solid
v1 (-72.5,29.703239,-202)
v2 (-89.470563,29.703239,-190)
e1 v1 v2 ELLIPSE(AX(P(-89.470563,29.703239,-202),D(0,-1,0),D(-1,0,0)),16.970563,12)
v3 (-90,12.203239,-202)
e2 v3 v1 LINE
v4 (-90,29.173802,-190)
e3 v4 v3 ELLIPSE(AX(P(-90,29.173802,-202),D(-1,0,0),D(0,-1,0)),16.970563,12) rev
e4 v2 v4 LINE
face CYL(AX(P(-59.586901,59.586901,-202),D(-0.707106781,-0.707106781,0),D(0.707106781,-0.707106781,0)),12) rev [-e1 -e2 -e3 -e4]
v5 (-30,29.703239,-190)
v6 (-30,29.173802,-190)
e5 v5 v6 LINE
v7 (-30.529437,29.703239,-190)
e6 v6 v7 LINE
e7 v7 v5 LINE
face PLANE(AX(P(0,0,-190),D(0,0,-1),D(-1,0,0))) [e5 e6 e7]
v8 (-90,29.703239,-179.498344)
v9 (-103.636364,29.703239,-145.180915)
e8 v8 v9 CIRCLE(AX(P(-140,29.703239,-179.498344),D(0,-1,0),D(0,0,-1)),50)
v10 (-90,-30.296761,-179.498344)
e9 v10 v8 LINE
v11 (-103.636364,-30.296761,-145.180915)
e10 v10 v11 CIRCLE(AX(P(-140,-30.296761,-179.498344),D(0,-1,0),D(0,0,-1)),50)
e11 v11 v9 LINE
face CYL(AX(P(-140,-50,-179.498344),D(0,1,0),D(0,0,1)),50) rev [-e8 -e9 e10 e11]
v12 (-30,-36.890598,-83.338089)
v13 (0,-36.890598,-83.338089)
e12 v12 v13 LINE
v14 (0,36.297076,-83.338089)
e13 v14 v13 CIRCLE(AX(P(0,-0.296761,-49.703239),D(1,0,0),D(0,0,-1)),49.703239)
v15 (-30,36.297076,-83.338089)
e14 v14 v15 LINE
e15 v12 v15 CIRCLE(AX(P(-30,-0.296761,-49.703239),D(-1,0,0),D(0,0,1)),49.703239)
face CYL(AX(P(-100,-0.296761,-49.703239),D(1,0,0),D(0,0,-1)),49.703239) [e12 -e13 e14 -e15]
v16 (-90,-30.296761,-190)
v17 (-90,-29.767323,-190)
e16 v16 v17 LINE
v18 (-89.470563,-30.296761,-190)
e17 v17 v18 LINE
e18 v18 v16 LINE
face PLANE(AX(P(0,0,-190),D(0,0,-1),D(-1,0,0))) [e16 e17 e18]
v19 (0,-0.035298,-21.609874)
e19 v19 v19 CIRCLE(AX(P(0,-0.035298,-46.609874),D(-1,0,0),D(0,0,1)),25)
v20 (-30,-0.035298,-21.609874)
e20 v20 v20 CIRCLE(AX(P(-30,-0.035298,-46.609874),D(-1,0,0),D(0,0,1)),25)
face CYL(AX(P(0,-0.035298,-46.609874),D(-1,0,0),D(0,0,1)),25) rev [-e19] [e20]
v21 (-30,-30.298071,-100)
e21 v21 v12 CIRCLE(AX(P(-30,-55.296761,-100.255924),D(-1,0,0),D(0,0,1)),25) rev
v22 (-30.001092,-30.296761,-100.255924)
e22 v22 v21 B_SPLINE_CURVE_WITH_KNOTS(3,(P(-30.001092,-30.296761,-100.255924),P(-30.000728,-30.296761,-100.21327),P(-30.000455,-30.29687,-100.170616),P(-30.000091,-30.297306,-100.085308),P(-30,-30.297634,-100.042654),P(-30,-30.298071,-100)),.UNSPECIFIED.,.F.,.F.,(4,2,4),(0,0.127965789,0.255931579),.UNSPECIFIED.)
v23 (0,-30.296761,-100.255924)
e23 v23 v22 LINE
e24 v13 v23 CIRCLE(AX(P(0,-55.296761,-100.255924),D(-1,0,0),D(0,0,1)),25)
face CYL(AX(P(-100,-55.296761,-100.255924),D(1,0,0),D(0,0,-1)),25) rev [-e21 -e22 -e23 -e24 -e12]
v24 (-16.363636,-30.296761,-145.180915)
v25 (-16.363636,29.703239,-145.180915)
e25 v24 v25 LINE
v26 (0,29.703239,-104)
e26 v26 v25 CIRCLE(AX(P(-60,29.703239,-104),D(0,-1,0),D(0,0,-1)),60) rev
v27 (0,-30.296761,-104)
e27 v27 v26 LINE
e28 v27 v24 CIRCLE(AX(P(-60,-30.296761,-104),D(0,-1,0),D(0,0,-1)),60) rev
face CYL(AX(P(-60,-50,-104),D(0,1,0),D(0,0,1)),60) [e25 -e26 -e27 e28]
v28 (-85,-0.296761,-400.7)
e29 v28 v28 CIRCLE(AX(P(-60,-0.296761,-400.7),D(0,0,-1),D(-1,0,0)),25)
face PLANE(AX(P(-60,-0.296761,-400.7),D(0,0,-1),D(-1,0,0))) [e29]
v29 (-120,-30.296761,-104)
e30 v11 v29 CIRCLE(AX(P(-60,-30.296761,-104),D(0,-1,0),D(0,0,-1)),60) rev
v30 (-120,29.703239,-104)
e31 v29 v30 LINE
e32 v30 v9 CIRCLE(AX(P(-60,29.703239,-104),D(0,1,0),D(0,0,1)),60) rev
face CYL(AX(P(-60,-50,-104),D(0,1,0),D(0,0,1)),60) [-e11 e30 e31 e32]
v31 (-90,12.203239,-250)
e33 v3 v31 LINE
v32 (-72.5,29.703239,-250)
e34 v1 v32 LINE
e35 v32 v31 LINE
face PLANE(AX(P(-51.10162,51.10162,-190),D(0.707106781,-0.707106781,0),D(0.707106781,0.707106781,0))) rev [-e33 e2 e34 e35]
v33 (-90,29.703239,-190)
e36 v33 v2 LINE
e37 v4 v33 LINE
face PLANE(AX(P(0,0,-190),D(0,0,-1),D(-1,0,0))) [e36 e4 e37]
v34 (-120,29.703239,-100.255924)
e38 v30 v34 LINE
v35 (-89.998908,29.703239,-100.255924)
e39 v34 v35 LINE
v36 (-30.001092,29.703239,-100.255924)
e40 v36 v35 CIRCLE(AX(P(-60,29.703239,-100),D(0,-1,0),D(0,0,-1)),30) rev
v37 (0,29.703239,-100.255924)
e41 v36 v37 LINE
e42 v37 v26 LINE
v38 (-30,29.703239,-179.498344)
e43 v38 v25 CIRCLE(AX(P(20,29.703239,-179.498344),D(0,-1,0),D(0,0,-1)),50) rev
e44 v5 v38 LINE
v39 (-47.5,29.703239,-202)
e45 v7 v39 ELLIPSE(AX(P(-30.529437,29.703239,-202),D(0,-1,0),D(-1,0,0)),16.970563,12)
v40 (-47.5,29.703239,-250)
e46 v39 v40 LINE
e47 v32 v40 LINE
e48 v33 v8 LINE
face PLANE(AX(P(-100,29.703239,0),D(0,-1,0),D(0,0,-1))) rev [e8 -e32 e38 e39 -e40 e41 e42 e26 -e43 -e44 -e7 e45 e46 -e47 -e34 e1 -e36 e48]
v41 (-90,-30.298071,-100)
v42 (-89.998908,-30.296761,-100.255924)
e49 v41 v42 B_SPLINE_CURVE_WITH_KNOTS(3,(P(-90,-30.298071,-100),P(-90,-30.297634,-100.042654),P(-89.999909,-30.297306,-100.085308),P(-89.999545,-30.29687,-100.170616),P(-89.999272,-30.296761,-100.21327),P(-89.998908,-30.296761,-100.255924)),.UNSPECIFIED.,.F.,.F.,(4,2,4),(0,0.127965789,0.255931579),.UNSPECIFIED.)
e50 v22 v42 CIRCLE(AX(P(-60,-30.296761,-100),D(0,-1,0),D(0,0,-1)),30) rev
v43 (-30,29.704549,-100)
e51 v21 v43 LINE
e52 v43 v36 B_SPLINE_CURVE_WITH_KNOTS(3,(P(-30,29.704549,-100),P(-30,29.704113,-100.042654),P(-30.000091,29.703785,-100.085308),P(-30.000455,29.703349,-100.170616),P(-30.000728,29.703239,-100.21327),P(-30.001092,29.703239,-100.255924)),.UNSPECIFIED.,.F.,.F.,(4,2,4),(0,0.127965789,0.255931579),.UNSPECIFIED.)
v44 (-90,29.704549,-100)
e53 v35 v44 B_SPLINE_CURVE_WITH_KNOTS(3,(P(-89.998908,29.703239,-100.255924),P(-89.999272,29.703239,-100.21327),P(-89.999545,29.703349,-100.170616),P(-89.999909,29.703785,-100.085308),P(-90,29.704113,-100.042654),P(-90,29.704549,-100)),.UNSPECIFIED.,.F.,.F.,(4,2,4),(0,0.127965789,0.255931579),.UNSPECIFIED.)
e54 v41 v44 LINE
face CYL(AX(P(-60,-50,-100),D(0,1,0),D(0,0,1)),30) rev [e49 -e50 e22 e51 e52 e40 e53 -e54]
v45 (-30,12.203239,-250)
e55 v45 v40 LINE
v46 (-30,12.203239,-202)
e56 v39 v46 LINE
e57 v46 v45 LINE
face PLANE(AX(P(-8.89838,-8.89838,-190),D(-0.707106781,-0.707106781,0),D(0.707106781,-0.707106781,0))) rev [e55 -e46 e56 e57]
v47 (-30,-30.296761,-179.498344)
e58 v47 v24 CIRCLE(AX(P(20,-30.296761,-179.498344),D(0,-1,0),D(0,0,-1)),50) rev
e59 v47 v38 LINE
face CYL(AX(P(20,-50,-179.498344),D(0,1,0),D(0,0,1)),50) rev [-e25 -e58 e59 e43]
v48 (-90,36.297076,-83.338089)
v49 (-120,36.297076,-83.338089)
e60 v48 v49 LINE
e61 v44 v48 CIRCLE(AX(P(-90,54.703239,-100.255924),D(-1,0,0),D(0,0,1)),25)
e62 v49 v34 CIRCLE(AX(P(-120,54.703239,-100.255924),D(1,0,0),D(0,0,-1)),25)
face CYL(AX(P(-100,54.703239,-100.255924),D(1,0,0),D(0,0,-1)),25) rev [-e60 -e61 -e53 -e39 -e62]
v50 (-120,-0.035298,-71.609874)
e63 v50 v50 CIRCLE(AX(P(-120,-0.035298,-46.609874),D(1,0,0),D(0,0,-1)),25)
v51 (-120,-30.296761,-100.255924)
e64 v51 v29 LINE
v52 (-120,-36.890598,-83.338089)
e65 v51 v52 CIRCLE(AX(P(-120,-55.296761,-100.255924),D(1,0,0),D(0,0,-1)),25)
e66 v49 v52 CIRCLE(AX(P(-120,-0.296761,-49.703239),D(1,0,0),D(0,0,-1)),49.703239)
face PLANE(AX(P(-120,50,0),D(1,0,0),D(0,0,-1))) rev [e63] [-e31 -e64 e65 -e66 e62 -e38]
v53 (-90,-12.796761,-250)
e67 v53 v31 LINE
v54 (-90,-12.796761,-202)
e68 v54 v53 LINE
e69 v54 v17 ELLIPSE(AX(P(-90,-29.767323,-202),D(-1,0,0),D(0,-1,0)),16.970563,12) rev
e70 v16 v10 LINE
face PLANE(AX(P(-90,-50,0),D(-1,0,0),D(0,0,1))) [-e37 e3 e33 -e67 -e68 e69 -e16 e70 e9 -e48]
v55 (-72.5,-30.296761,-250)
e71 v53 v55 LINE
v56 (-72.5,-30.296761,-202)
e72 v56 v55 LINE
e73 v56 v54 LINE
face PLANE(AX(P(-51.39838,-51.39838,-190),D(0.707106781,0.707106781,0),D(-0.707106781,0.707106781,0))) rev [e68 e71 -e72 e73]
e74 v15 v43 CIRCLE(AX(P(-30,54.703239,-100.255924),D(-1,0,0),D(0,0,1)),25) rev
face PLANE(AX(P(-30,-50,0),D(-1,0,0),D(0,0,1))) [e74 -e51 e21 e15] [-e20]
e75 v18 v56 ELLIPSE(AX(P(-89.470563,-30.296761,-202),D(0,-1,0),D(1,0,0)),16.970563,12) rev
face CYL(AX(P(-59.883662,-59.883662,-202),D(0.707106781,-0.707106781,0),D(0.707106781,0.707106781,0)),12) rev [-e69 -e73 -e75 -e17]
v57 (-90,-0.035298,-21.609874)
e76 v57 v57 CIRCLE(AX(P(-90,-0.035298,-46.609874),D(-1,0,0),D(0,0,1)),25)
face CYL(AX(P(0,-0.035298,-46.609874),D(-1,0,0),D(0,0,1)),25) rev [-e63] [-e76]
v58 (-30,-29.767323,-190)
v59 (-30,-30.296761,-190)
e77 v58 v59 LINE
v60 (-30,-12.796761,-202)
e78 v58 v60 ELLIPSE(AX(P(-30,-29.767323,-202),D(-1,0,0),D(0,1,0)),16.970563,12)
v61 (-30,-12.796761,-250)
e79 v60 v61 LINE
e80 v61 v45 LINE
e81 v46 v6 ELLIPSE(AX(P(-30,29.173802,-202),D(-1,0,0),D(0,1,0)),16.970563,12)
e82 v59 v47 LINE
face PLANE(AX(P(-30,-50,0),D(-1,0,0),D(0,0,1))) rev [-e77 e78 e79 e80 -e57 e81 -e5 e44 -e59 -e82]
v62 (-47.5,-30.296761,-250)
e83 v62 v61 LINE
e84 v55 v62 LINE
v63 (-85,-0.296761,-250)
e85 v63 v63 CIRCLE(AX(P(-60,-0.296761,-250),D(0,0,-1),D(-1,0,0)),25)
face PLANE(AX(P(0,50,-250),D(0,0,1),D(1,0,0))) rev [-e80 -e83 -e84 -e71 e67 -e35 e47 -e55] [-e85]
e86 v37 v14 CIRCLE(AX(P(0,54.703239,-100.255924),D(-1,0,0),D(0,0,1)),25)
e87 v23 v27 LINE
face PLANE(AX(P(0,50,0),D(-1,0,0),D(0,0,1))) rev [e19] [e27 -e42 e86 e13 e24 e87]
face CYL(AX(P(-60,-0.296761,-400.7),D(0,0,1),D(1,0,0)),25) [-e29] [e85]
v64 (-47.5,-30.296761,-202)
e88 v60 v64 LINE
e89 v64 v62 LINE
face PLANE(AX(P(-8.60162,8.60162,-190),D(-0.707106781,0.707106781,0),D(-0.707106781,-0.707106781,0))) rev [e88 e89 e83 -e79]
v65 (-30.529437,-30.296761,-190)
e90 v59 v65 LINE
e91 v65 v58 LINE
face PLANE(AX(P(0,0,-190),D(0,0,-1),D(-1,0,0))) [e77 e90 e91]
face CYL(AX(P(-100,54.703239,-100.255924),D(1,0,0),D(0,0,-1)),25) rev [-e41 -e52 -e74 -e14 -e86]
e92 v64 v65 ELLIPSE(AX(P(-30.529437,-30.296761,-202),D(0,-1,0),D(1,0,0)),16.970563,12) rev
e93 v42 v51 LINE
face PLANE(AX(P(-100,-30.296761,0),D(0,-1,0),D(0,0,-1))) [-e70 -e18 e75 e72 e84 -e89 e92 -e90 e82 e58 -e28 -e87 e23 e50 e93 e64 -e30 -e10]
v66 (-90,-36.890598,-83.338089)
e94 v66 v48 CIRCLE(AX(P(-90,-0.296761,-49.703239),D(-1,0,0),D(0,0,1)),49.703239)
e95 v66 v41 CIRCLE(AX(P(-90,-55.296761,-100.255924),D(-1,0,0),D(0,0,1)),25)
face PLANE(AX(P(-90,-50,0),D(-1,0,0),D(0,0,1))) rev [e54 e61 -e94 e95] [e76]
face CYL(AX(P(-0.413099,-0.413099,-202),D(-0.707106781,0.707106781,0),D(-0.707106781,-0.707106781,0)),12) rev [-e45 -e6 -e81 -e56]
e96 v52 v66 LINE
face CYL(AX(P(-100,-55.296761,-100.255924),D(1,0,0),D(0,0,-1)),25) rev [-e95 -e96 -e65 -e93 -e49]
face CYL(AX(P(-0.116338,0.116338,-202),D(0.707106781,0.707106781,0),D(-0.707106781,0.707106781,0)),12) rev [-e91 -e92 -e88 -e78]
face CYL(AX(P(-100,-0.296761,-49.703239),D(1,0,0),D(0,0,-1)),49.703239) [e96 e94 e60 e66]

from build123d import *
from build123d.topology import SkipClean

# Parameters (mm, degrees)
SKETCH2_W                = 120
SKETCH2_H                = 250
BOSS_EXTRUDE1_DEPTH      = 50
CUT_EXTRUDE1_DEPTH       = 295.78805946
CUT_EXTRUDE1_DEPTH_BACK  = 295.78805946
CUT_EXTRUDE2_DEPTH       = 100
CUT_EXTRUDE3_DEPTH       = 282.780056072
CUT_EXTRUDE3_DEPTH_BACK  = 282.780056072
FILLET1_R                = 25
CUT_EXTRUDE5_DEPTH       = 60
FILLET4_R                = 12
SKETCH8_R                = 25
BOSS_EXTRUDE2_DEPTH      = 150.7
CUT_EXTRUDE11_DEPTH      = 422.260596346
CUT_EXTRUDE11_DEPTH_BACK = 422.260596346
SKETCH9_R                = 25


with BuildPart() as part:
    # Sketch2 → Boss-Extrude1 (new, symmetric)
    with BuildSketch(Plane(origin=(0, 0, 0), x_dir=(1, 0, 0), z_dir=(0, 1, 0))):
        with Locations((-60, 125)):
            Rectangle(SKETCH2_W, SKETCH2_H)
    extrude(amount=BOSS_EXTRUDE1_DEPTH, both=True)

    # Sketch3 → Cut-Extrude1 (cut, two sides: drawn at the far end of the back side and taken through both)
    with BuildSketch(Plane(origin=(0, 50, 0), x_dir=(1, 0, 0), z_dir=(0, 1, 0)).offset(-CUT_EXTRUDE1_DEPTH_BACK)):
        with BuildLine():
            ThreePointArc((-30, 100), (-60, 130), (-90, 100))
            Line((-90, 100), (-90, 0))
            Line((-90, 0), (-30, 0))
            Line((-30, 0), (-30, 100))
        make_face()
        with BuildLine():
            Line((-120, 250), (-120, 104))
            ThreePointArc((-120, 104), (-115.759222637, 126.156468376), (-103.636363636, 145.180915101))
            ThreePointArc((-103.636363636, 145.180915101), (-93.533981136, 161.034620706), (-90, 179.498344353))
            Line((-90, 179.498344353), (-90, 250))
            Line((-90, 250), (-120, 250))
        make_face()
        with BuildLine():
            ThreePointArc((-16.363636364, 145.180915101), (-4.240777363, 126.156468376), (0, 104))
            Line((0, 104), (0, 250))
            Line((0, 250), (-30, 250))
            Line((-30, 250), (-30, 179.498344353))
            ThreePointArc((-30, 179.498344353), (-26.466018864, 161.034620706), (-16.363636364, 145.180915101))
        make_face()
    extrude(amount=CUT_EXTRUDE1_DEPTH + CUT_EXTRUDE1_DEPTH_BACK, mode=Mode.SUBTRACT)

    # Sketch4 → Cut-Extrude2 (cut)
    with BuildSketch(Plane(origin=(0, 0, 0), x_dir=(0, 0, -1), z_dir=(1, 0, 0))):
        with BuildLine():
            ThreePointArc((89.331663554, -30.296760633), (71.831443345, -44.802429848), (49.703239367, -50))
            Line((49.703239367, -50), (250, -50))
            Line((250, -50), (250, -30.296760633))
            Line((250, -30.296760633), (89.331663554, -30.296760633))
        make_face()
        with BuildLine():
            Line((0, -50), (49.703239367, -50))
            ThreePointArc((49.703239367, -50), (14.557741777, -35.442258249), (0, -0.29676067))
            Line((0, -0.29676067), (0, -50))
        make_face()
        with BuildLine():
            Line((0, 50), (0, -0.29676067))
            ThreePointArc((0, -0.29676067), (33.879981934, 46.820502952), (89.331663554, 29.703239367))
            Line((89.331663554, 29.703239367), (250, 29.703239367))
            Line((250, 29.703239367), (250, 50))
            Line((250, 50), (0, 50))
        make_face()
    extrude(amount=-CUT_EXTRUDE2_DEPTH, mode=Mode.SUBTRACT)

    # Sketch5 → Cut-Extrude3 (cut, two sides: drawn at the far end of the back side and taken through both)
    with SkipClean():  # the faces are left unmerged after this step: merging them gives an invalid solid
        with BuildSketch(Plane(origin=(0, 0, 0), x_dir=(0, 0, -1), z_dir=(1, 0, 0)).offset(-CUT_EXTRUDE3_DEPTH_BACK)):
            with BuildLine():
                Line((89.331663554, 29.703239367), (149.498344353, 29.703239367))
                Line((149.498344353, 29.703239367), (149.498344353, 50))
                Line((149.498344353, 50), (0, 50))
                Line((0, 50), (0, -0.296760633))
                ThreePointArc((0, -0.296760633), (33.879981952, 46.820502958), (89.331663554, 29.703239367))
            make_face()
            with BuildLine():
                Line((149.498344353, -30.296760633), (89.331663554, -30.296760633))
                ThreePointArc((89.331663554, -30.296760633), (71.831443345, -44.802429848), (49.703239367, -50))
                Line((49.703239367, -50), (149.498344353, -50))
                Line((149.498344353, -50), (149.498344353, -30.296760633))
            make_face()
            with BuildLine():
                ThreePointArc((49.703239367, -50), (14.557741764, -35.442258236), (0, -0.296760633))
                Line((0, -0.296760633), (0, -50))
                Line((0, -50), (49.703239367, -50))
            make_face()
        extrude(amount=CUT_EXTRUDE3_DEPTH + CUT_EXTRUDE3_DEPTH_BACK, mode=Mode.SUBTRACT)

    # Fillet1
    fillet1_edges = [part.edges().sort_by_distance(p)[0] for p in [
        (-15, -30.296760633, -89.331663554),
    ]]
    fillet(fillet1_edges, radius=FILLET1_R)
    fillet1_2_edges = [part.edges().sort_by_distance(p)[0] for p in [
        (-95, -30.296760633, -89.331663554),
        (-110, -30.296760633, -89.331663554),
    ]]
    fillet(fillet1_2_edges, radius=FILLET1_R)
    fillet1_3_edges = [part.edges().sort_by_distance(p)[0] for p in [
        (-95, 29.703239367, -89.331663554),
        (-110, 29.703239367, -89.331663554),
    ]]
    fillet(fillet1_3_edges, radius=FILLET1_R)
    fillet1_4_edges = [part.edges().sort_by_distance(p)[0] for p in [
        (-15, 29.703239367, -89.331663554),
    ]]
    fillet(fillet1_4_edges, radius=FILLET1_R)

    # Sketch6 → Cut-Extrude5 (cut)
    with BuildSketch(Plane(origin=(0, 0, -250), x_dir=(-1, 0, 0), z_dir=(0, 0, -1))):
        Polygon((90, 12.203239367), (90, 29.703239367), (72.5, 29.703239367), align=None)
        Polygon((90, -30.296760633), (90, -12.796760633), (72.5, -30.296760633), align=None)
        Polygon((47.5, -30.296760633), (30, -12.796760633), (30, -30.296760633), align=None)
        Polygon((30, 12.203239367), (47.5, 29.703239367), (30, 29.703239367), align=None)
    extrude(amount=-CUT_EXTRUDE5_DEPTH, mode=Mode.SUBTRACT)

    # Fillet4
    fillet4_edges = [part.edges().sort_by_distance(p)[0] for p in [
        (-81.25, -21.546760633, -190),
        (-81.25, 20.953239367, -190),
        (-38.75, -21.546760633, -190),
        (-38.75, 20.953239367, -190),
    ]]
    fillet(fillet4_edges, radius=FILLET4_R)

    # Sketch8 → Boss-Extrude2 (add)
    with BuildSketch(Plane(origin=(0, 0, -250), x_dir=(-1, 0, 0), z_dir=(0, 0, -1))):
        with Locations((60, -0.296760633)):
            Circle(SKETCH8_R)
    extrude(amount=BOSS_EXTRUDE2_DEPTH)

    # Sketch9 → Cut-Extrude11 (cut, two sides: drawn at the far end of the back side and taken through both)
    with BuildSketch(Plane.ZY.offset(120).offset(-CUT_EXTRUDE11_DEPTH_BACK)):
        with Locations((-46.609873597, -0.035297833)):
            Circle(SKETCH9_R)
    extrude(amount=CUT_EXTRUDE11_DEPTH + CUT_EXTRUDE11_DEPTH_BACK, mode=Mode.SUBTRACT)


solid = part.part
